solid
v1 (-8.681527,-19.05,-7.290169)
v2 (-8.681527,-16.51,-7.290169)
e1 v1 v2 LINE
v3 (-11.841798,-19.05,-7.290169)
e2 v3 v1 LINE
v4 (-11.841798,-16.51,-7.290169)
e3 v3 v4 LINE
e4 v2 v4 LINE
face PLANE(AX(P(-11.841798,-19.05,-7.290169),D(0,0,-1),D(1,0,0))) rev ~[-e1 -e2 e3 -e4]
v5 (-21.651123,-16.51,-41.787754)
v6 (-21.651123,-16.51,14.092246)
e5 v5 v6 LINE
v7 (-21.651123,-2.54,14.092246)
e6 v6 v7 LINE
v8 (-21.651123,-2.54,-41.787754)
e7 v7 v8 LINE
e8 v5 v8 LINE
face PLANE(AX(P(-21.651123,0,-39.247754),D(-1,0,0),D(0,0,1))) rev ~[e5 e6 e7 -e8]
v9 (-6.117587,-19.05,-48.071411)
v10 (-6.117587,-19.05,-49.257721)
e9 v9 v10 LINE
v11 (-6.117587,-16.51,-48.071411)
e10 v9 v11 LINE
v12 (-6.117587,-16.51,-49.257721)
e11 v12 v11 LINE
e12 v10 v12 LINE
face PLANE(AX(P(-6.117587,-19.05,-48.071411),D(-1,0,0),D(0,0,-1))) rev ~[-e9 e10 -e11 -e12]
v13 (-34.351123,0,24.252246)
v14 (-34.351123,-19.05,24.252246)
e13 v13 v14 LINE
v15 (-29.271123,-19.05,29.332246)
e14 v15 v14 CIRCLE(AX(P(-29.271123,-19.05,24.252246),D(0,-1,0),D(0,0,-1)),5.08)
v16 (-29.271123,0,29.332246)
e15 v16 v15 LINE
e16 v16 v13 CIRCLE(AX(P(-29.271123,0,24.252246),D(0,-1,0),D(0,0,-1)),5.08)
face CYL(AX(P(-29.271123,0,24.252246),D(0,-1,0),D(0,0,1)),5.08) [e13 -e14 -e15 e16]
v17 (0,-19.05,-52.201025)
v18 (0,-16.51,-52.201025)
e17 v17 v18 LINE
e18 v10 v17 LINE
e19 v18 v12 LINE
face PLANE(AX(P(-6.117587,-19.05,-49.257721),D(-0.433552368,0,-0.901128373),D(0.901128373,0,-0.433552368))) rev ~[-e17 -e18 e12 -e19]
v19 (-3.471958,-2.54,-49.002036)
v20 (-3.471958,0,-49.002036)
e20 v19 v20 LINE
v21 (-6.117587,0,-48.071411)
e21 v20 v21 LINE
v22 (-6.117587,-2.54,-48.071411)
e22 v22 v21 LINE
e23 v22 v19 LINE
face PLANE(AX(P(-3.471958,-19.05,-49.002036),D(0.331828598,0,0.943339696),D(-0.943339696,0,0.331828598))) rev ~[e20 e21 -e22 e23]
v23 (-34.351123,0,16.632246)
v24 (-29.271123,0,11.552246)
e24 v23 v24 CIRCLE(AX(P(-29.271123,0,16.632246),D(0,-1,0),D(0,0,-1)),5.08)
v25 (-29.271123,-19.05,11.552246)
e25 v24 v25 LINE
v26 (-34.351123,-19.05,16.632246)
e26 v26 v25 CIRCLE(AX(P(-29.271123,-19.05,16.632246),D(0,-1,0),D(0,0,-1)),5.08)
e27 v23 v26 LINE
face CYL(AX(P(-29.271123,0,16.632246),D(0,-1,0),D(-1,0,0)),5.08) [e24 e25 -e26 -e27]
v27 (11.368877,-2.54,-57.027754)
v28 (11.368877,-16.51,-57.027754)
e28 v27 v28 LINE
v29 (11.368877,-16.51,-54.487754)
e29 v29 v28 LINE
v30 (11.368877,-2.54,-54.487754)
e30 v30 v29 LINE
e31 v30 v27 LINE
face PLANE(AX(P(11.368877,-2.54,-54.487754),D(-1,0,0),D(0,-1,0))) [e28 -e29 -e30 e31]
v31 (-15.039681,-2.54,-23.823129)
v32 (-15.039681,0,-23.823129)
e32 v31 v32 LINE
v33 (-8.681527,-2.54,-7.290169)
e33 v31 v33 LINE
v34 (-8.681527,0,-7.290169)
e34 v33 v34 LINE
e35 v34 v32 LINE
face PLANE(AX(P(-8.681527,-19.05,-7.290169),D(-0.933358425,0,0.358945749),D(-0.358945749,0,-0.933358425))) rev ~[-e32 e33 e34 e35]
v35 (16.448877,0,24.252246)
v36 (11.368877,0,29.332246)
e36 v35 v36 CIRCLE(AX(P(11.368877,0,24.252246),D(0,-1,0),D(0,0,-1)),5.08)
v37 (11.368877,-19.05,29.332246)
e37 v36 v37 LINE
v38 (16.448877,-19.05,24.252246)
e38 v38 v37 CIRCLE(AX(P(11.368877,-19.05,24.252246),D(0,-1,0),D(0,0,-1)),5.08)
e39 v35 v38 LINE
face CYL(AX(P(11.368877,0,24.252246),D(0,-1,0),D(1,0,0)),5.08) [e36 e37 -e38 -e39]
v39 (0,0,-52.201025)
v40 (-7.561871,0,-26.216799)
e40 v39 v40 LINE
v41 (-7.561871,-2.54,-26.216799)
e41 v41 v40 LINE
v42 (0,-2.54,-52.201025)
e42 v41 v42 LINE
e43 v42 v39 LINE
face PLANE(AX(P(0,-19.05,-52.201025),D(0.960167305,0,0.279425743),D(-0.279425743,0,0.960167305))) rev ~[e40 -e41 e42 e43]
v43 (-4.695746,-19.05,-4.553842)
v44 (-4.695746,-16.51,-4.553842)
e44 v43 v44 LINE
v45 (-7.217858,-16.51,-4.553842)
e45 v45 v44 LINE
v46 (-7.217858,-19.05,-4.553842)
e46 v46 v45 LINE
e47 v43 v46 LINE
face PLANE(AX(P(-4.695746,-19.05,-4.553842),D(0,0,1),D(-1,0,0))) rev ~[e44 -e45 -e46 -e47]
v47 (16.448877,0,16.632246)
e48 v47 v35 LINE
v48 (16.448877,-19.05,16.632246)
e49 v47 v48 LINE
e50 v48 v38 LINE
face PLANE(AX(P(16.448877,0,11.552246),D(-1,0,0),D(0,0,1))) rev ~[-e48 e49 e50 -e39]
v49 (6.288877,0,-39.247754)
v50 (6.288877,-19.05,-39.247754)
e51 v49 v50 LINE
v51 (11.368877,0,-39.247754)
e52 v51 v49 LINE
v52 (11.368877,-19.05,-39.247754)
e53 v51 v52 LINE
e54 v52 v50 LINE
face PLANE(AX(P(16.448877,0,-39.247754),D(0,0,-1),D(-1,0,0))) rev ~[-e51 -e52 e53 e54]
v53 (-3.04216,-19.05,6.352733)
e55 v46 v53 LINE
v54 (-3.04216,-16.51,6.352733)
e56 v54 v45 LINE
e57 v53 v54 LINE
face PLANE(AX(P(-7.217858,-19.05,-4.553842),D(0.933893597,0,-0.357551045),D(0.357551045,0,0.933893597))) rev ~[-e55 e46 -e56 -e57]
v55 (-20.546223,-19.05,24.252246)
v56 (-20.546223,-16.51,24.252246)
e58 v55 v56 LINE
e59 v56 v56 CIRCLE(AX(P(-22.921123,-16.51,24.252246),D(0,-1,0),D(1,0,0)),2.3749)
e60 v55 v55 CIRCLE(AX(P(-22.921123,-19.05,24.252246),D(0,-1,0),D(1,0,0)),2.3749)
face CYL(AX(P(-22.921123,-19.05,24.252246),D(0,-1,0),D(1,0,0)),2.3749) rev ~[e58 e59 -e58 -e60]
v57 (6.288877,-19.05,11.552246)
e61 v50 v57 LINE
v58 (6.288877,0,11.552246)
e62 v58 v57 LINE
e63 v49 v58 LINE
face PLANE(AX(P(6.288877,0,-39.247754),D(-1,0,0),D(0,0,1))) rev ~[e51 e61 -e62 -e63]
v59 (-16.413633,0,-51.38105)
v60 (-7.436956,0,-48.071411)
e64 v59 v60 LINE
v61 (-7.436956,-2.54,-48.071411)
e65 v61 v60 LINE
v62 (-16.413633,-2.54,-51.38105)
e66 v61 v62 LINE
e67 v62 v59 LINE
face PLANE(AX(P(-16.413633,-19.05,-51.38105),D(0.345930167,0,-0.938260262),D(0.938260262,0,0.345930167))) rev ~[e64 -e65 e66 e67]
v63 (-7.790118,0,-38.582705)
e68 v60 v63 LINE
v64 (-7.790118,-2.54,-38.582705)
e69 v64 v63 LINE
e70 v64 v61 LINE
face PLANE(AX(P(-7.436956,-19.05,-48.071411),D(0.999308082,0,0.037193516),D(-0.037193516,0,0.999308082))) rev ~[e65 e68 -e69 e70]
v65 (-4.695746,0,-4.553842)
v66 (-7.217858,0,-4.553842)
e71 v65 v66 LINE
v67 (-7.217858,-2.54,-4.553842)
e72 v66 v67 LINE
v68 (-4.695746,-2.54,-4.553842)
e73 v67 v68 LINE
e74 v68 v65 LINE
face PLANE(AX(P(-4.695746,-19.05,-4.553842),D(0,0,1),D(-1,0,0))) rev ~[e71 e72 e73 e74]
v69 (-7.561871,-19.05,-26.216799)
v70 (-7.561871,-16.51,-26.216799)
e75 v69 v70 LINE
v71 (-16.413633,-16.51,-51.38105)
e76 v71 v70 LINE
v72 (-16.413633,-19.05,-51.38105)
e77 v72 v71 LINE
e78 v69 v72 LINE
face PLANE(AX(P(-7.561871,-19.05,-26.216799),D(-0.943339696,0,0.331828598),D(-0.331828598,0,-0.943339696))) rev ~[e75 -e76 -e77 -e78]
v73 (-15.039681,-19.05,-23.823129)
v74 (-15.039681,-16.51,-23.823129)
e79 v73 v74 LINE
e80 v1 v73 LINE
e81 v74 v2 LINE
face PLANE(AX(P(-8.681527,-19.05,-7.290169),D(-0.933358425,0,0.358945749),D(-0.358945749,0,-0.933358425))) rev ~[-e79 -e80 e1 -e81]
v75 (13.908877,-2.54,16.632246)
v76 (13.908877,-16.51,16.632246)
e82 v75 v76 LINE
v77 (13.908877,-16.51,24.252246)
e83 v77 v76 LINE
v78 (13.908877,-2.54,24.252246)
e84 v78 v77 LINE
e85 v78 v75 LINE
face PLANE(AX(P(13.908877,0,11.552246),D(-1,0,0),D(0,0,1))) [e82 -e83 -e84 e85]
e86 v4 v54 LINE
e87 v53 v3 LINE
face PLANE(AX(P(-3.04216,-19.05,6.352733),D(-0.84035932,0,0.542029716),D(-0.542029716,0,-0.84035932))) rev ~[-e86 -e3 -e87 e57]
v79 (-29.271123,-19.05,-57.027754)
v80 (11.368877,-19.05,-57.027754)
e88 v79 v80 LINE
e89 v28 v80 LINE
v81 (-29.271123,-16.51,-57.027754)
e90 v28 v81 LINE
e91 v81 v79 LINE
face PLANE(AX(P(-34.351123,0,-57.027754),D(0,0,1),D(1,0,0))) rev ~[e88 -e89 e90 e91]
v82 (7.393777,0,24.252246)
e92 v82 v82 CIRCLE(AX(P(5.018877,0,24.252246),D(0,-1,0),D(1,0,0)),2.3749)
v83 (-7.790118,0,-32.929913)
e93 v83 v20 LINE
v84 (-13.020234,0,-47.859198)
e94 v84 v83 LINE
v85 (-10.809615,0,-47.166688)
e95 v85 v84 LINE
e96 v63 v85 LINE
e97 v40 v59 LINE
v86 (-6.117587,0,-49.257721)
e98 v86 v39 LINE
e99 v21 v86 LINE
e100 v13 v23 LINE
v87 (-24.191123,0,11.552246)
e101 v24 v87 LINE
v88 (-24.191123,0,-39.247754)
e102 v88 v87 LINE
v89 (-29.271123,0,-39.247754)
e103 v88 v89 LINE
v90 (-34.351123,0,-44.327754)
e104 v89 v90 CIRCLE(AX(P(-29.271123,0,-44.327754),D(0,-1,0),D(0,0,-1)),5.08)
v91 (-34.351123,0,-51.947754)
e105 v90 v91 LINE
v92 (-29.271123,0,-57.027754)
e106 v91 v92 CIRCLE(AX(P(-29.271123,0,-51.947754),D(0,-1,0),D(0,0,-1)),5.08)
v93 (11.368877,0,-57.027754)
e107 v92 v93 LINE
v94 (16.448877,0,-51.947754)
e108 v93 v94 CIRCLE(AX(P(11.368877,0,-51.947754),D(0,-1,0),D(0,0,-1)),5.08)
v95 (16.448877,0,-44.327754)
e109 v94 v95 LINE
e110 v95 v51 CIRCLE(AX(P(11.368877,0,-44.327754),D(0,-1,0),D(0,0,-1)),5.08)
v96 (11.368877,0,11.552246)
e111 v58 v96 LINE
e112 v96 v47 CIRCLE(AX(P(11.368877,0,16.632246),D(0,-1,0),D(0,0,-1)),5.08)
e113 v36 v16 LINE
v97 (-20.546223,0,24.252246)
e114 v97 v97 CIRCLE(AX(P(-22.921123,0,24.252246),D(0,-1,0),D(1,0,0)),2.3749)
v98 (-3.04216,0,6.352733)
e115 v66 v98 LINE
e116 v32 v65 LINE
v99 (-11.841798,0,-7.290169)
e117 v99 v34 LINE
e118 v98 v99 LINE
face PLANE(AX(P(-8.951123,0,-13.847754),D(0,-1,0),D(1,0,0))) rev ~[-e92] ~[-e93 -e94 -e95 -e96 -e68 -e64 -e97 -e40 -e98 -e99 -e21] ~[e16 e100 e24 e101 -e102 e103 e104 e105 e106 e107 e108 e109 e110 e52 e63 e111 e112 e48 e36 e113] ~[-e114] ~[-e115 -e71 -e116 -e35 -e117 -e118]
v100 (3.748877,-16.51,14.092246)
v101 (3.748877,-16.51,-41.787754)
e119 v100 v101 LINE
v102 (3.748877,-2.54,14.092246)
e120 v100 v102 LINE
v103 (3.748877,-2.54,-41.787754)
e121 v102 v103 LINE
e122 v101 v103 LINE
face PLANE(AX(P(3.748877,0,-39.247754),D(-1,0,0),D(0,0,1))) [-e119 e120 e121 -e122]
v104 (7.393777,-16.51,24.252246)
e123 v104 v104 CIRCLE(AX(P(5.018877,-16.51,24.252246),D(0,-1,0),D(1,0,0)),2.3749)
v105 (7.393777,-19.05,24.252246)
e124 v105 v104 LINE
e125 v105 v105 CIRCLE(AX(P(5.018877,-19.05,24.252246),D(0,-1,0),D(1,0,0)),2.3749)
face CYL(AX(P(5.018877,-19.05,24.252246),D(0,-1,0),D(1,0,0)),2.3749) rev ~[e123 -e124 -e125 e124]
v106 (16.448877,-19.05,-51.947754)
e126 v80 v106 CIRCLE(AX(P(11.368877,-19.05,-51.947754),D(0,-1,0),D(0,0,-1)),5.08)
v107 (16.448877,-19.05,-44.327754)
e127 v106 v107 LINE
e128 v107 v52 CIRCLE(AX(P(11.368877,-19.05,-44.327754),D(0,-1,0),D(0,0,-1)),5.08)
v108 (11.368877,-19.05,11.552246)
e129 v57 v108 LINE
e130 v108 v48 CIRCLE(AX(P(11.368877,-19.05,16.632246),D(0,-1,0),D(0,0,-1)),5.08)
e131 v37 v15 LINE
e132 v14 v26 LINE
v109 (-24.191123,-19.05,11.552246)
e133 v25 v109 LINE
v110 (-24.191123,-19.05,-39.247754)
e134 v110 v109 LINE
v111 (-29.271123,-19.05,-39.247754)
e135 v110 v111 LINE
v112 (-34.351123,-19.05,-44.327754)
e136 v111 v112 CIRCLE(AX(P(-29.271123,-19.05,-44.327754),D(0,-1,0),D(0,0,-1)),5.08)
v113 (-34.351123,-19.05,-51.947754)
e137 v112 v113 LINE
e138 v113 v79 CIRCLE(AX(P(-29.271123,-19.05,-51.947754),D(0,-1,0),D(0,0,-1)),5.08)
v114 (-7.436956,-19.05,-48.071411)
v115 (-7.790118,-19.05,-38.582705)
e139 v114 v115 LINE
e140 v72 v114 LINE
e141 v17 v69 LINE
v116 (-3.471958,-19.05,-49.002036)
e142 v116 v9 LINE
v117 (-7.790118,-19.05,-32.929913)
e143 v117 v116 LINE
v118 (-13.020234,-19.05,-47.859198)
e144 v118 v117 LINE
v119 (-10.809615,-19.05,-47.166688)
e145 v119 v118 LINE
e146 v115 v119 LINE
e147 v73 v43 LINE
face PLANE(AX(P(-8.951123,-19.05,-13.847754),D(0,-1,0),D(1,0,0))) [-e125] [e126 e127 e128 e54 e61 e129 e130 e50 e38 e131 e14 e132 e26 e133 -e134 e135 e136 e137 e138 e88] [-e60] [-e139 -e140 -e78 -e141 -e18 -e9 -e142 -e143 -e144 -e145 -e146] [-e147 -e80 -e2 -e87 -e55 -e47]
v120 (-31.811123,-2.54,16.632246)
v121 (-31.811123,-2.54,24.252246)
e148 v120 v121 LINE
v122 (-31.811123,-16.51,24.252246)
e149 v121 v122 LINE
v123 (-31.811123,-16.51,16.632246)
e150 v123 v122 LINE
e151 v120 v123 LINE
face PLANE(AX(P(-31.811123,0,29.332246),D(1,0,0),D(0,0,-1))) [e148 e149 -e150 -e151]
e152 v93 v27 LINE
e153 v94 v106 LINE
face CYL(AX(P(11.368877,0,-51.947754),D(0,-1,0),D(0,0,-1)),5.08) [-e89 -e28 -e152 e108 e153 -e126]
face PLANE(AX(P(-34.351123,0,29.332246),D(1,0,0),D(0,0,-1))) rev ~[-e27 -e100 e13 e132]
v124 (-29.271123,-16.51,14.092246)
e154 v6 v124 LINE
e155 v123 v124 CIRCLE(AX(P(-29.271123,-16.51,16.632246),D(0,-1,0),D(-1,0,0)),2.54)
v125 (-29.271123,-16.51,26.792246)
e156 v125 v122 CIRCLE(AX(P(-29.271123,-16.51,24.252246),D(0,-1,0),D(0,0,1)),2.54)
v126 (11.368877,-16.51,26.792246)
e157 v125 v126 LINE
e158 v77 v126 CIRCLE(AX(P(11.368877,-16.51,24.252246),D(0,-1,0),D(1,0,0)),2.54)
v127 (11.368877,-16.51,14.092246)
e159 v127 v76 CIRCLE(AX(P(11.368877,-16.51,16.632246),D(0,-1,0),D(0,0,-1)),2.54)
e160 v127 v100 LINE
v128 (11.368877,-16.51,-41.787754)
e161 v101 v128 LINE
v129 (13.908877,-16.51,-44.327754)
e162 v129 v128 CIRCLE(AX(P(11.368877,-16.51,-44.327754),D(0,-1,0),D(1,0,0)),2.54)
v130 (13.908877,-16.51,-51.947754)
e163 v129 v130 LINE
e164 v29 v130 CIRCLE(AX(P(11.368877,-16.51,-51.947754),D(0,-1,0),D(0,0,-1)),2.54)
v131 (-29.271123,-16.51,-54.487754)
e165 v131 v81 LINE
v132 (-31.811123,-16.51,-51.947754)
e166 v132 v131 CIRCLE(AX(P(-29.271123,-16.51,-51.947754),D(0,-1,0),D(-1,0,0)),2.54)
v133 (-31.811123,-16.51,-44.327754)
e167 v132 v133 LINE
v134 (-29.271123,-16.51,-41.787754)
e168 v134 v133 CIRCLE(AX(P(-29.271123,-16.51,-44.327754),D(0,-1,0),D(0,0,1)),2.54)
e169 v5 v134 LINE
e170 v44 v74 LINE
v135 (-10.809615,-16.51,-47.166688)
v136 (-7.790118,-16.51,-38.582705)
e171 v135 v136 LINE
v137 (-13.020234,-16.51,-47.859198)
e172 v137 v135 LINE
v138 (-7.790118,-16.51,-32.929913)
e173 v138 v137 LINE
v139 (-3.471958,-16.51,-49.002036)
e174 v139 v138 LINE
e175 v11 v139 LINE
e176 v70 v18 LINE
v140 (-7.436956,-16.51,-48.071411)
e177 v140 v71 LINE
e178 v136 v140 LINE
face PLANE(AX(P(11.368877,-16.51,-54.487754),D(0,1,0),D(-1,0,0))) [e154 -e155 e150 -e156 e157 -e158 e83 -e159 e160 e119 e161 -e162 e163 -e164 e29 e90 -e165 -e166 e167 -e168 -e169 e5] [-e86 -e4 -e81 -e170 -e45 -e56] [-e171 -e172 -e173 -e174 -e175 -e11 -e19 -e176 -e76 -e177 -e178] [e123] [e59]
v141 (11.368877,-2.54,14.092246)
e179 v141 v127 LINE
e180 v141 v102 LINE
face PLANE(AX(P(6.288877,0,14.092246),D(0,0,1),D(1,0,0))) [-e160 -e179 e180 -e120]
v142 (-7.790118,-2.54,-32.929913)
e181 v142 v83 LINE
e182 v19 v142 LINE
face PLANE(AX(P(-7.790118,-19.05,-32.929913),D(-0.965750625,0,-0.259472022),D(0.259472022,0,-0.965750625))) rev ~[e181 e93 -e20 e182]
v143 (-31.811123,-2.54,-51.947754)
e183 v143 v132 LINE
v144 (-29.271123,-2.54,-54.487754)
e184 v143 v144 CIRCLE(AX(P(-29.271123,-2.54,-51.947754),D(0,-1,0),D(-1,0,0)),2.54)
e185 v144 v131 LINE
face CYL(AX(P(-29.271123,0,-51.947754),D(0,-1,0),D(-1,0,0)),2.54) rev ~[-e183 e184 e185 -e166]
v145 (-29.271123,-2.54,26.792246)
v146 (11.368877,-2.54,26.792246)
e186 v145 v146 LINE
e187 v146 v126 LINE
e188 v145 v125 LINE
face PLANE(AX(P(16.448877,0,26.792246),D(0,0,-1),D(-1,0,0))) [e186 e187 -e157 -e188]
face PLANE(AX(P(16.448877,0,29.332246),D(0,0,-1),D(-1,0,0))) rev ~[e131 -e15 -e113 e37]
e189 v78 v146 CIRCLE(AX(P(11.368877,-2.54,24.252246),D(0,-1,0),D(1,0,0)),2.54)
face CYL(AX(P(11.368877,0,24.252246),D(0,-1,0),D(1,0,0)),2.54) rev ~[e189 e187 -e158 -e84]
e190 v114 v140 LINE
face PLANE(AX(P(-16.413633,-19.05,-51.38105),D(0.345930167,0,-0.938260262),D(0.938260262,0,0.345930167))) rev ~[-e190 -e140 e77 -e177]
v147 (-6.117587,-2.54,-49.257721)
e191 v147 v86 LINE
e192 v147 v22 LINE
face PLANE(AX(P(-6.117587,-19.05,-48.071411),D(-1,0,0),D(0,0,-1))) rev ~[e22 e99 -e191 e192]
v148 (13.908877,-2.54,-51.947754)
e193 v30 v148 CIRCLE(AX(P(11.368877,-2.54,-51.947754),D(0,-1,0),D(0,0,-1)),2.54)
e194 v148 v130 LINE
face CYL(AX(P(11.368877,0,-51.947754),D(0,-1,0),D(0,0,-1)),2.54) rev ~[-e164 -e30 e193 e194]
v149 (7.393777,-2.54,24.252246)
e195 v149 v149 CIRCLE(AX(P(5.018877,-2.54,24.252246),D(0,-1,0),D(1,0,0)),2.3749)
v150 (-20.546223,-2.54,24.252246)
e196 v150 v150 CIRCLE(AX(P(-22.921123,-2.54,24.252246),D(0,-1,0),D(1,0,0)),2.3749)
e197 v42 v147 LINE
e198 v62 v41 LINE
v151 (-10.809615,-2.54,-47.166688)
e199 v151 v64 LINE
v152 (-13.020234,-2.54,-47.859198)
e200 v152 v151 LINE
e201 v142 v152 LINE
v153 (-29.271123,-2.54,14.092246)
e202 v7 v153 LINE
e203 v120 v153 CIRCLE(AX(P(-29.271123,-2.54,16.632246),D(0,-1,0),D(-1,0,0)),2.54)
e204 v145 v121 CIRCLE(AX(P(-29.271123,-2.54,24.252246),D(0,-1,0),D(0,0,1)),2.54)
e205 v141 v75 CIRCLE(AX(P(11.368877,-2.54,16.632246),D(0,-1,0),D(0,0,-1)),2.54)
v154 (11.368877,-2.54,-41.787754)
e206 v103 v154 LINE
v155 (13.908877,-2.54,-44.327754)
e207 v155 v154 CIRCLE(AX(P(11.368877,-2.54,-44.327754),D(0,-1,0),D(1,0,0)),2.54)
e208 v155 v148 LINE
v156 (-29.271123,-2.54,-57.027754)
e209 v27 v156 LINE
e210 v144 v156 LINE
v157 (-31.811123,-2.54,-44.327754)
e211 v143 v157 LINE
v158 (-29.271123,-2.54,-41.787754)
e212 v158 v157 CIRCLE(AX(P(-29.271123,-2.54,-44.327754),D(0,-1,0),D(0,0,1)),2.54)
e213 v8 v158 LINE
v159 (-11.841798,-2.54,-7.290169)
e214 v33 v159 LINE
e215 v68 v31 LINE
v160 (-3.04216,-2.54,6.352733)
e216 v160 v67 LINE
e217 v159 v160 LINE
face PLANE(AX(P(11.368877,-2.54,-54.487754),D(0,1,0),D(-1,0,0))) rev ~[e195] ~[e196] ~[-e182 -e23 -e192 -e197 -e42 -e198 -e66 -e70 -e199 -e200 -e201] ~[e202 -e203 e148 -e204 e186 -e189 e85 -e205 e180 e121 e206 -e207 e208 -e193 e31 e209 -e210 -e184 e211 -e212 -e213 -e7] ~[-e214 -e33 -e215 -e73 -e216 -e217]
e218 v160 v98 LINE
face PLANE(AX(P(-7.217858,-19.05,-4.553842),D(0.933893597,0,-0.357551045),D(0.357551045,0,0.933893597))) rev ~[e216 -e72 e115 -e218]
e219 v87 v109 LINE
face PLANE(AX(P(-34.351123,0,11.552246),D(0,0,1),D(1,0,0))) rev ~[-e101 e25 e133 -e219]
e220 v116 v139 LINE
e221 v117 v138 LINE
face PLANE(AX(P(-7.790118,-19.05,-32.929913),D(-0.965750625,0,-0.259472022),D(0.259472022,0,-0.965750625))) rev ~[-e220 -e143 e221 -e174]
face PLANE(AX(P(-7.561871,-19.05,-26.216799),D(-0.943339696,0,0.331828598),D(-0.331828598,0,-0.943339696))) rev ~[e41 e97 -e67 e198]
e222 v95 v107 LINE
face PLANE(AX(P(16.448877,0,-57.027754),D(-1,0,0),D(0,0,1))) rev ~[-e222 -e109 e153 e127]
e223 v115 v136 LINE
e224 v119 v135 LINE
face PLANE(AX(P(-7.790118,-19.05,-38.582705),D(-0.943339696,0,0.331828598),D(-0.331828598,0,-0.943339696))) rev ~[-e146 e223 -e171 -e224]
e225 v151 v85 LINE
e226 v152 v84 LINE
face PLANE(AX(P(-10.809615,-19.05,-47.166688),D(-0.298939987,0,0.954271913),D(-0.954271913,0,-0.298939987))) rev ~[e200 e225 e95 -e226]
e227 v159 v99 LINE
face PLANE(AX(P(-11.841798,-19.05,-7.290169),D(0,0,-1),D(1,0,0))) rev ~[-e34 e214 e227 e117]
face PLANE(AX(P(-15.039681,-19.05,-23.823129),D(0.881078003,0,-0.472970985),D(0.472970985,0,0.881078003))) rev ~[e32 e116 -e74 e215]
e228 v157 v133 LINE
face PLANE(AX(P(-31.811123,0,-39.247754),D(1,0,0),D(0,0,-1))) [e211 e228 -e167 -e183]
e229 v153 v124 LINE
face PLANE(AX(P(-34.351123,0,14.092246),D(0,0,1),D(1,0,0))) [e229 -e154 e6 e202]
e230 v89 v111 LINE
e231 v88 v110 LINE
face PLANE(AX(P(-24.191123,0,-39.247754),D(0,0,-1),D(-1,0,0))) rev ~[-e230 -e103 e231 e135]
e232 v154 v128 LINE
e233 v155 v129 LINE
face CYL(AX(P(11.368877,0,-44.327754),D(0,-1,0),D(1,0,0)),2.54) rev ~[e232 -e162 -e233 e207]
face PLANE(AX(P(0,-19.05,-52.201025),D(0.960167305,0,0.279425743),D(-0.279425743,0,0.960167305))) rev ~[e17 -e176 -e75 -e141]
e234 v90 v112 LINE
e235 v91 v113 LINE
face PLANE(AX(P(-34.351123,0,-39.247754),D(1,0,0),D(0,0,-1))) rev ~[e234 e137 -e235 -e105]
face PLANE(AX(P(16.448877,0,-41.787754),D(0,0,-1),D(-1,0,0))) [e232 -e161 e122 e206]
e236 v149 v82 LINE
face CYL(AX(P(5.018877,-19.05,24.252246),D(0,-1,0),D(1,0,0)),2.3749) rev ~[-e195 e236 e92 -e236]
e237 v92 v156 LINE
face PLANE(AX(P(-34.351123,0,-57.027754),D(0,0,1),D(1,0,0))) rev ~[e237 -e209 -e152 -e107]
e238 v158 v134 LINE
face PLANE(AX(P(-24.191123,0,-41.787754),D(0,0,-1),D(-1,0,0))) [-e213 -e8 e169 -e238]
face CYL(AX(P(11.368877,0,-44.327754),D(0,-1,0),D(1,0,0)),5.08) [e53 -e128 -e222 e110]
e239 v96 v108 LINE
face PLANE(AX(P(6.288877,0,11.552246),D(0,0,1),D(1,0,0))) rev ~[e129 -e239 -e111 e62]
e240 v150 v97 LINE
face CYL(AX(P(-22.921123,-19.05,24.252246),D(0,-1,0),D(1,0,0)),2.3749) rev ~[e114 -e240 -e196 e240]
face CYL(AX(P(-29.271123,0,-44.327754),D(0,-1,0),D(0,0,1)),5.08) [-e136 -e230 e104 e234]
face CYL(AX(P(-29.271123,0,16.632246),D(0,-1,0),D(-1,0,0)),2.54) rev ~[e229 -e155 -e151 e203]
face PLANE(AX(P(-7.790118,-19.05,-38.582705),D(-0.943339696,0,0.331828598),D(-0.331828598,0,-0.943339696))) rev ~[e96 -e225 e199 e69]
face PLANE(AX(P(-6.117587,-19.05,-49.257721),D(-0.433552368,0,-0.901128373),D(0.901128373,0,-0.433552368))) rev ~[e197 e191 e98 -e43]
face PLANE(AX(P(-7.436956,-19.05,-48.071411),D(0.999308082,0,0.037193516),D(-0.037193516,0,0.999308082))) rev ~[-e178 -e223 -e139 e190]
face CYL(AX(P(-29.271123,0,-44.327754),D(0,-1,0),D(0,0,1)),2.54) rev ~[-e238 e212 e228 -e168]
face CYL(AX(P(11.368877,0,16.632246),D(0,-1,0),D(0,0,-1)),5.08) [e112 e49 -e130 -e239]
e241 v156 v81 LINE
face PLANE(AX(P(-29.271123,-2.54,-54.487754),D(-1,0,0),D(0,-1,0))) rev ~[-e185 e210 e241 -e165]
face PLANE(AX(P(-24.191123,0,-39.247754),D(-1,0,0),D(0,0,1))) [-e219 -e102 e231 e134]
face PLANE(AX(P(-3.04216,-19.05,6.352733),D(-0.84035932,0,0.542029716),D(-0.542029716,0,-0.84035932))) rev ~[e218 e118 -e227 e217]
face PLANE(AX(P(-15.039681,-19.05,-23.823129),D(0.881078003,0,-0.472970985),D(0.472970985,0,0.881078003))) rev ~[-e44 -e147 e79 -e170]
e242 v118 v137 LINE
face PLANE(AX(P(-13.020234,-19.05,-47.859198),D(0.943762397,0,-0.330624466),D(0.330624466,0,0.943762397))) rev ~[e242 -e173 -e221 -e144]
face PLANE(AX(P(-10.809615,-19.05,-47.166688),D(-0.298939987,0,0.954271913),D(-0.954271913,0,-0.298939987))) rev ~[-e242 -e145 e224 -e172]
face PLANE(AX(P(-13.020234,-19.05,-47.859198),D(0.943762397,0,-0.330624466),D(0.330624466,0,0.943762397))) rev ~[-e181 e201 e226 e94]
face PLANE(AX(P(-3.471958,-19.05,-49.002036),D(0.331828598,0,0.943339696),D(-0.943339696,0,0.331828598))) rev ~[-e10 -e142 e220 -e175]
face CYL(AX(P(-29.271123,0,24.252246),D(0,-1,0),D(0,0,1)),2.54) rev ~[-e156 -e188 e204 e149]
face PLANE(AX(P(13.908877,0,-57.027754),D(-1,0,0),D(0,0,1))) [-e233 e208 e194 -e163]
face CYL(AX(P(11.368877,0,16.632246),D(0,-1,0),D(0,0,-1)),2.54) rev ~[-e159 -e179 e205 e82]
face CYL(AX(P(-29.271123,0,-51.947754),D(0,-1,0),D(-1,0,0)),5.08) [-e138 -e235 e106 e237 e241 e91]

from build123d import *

# Parameters (mm, degrees)
F0_W     = 30.48
F0_H     = 50.8
F1_DEPTH = 19.05
F2_R     = 5.08
F4_T     = -2.54
F3_R     = 2.3749
F5_DEPTH = 45.59299
F7_DEPTH = 16.68371
F8_DEPTH = 25.4


# Not quite as in the source:
# - a shell that OpenCascade refuses in one call is made with other operations: the cavity is built on its own and cut out


with BuildPart() as f1:
    # F0 (on Front) → F1 (new body)
    with BuildSketch(Plane.XZ):
        with Locations((-8.951122936, -13.8477537125)):
            Rectangle(F0_W, F0_H)
        Polygon((6.288877064, -39.2477537125), (-24.191122936, -39.2477537125), (-34.351122936, -39.2477537125), (-34.351122936, -57.0277537125), (16.448877064, -57.0277537125), (16.448877064, -39.2477537125), align=None)
        Polygon((16.448877064, 29.3322462875), (-34.351122936, 29.3322462875), (-34.351122936, 11.5522462875), (-24.191122936, 11.5522462875), (6.288877064, 11.5522462875), (16.448877064, 11.5522462875), align=None)
    extrude(amount=F1_DEPTH)

    # F2
    f2_edges = [f1.edges().sort_by_distance(p)[0] for p in [
        (-34.351123, -9.525, 11.552246),
        (16.448877, -9.525, 11.552246),
        (16.448877, -9.525, 29.332246),
        (-34.351123, -9.525, 29.332246),
        (-34.351123, -9.525, -39.247754),
        (-34.351123, -9.525, -57.027754),
        (16.448877, -9.525, -57.027754),
        (16.448877, -9.525, -39.247754),
    ]]
    fillet(f2_edges, radius=F2_R)

    # F4: a shell. OpenCascade refuses it in one call, so the cavity is built on its own and cut out:
    # the body offset inwards by the wall thickness, plus a prism from it out through each open face.
    f4_core = offset(f1.part, amount=F4_T, kind=Kind.INTERSECTION, mode=Mode.PRIVATE)
    f4_exits = [f4_core.faces().sort_by_distance(p)[0] for p in [
        (-8.951123, -9.525, -54.487754),
    ]]
    add(f4_core, mode=Mode.SUBTRACT)
    extrude(f4_exits, amount=-F4_T, mode=Mode.SUBTRACT)

    # F3 (on face) → F5 (cut)
    with BuildSketch(Plane.XZ.offset(19.05)):
        with Locations((-22.921122936, 24.2522462875)):
            Circle(F3_R)
        with Locations((5.018877064, 24.2522462875)):
            Circle(F3_R)
    extrude(amount=-F5_DEPTH, mode=Mode.SUBTRACT)

    # F6 (on face) → F7 (cut)
    with BuildSketch(Plane.XZ.offset(19.05)):
        Polygon((-7.217857521, -4.5538423583), (-3.042159602, 6.352733355), (-11.8417982012, -7.2901686653), (-8.6815273389, -7.2901686653), (-15.0396805257, -23.8231290132), (-4.6957456507, -4.5538423583), align=None)
    extrude(amount=-F7_DEPTH, mode=Mode.SUBTRACT)

    # F6 (on face) → F8 (cut)
    with BuildSketch(Plane.XZ.offset(19.05)):
        Polygon((-7.217857521, -4.5538423583), (-3.042159602, 6.352733355), (-11.8417982012, -7.2901686653), (-8.6815273389, -7.2901686653), (-15.0396805257, -23.8231290132), (-4.6957456507, -4.5538423583), align=None)
        Polygon((-7.5618713163, -26.2167993933), (-16.4136328948, -51.3810502087), (-7.4369557778, -48.071410507), (-7.7901184559, -38.5827049613), (-10.809615066, -47.1666878623), (-13.0202344465, -47.8591975347), (-7.7901184559, -32.9299127667), (-3.4719579703, -49.0020355231), (-6.1175874434, -48.071410507), (-6.1175874434, -49.2577214361), (0, -52.201025188), align=None)
    extrude(amount=-F8_DEPTH, mode=Mode.SUBTRACT)


solid = f1.part
